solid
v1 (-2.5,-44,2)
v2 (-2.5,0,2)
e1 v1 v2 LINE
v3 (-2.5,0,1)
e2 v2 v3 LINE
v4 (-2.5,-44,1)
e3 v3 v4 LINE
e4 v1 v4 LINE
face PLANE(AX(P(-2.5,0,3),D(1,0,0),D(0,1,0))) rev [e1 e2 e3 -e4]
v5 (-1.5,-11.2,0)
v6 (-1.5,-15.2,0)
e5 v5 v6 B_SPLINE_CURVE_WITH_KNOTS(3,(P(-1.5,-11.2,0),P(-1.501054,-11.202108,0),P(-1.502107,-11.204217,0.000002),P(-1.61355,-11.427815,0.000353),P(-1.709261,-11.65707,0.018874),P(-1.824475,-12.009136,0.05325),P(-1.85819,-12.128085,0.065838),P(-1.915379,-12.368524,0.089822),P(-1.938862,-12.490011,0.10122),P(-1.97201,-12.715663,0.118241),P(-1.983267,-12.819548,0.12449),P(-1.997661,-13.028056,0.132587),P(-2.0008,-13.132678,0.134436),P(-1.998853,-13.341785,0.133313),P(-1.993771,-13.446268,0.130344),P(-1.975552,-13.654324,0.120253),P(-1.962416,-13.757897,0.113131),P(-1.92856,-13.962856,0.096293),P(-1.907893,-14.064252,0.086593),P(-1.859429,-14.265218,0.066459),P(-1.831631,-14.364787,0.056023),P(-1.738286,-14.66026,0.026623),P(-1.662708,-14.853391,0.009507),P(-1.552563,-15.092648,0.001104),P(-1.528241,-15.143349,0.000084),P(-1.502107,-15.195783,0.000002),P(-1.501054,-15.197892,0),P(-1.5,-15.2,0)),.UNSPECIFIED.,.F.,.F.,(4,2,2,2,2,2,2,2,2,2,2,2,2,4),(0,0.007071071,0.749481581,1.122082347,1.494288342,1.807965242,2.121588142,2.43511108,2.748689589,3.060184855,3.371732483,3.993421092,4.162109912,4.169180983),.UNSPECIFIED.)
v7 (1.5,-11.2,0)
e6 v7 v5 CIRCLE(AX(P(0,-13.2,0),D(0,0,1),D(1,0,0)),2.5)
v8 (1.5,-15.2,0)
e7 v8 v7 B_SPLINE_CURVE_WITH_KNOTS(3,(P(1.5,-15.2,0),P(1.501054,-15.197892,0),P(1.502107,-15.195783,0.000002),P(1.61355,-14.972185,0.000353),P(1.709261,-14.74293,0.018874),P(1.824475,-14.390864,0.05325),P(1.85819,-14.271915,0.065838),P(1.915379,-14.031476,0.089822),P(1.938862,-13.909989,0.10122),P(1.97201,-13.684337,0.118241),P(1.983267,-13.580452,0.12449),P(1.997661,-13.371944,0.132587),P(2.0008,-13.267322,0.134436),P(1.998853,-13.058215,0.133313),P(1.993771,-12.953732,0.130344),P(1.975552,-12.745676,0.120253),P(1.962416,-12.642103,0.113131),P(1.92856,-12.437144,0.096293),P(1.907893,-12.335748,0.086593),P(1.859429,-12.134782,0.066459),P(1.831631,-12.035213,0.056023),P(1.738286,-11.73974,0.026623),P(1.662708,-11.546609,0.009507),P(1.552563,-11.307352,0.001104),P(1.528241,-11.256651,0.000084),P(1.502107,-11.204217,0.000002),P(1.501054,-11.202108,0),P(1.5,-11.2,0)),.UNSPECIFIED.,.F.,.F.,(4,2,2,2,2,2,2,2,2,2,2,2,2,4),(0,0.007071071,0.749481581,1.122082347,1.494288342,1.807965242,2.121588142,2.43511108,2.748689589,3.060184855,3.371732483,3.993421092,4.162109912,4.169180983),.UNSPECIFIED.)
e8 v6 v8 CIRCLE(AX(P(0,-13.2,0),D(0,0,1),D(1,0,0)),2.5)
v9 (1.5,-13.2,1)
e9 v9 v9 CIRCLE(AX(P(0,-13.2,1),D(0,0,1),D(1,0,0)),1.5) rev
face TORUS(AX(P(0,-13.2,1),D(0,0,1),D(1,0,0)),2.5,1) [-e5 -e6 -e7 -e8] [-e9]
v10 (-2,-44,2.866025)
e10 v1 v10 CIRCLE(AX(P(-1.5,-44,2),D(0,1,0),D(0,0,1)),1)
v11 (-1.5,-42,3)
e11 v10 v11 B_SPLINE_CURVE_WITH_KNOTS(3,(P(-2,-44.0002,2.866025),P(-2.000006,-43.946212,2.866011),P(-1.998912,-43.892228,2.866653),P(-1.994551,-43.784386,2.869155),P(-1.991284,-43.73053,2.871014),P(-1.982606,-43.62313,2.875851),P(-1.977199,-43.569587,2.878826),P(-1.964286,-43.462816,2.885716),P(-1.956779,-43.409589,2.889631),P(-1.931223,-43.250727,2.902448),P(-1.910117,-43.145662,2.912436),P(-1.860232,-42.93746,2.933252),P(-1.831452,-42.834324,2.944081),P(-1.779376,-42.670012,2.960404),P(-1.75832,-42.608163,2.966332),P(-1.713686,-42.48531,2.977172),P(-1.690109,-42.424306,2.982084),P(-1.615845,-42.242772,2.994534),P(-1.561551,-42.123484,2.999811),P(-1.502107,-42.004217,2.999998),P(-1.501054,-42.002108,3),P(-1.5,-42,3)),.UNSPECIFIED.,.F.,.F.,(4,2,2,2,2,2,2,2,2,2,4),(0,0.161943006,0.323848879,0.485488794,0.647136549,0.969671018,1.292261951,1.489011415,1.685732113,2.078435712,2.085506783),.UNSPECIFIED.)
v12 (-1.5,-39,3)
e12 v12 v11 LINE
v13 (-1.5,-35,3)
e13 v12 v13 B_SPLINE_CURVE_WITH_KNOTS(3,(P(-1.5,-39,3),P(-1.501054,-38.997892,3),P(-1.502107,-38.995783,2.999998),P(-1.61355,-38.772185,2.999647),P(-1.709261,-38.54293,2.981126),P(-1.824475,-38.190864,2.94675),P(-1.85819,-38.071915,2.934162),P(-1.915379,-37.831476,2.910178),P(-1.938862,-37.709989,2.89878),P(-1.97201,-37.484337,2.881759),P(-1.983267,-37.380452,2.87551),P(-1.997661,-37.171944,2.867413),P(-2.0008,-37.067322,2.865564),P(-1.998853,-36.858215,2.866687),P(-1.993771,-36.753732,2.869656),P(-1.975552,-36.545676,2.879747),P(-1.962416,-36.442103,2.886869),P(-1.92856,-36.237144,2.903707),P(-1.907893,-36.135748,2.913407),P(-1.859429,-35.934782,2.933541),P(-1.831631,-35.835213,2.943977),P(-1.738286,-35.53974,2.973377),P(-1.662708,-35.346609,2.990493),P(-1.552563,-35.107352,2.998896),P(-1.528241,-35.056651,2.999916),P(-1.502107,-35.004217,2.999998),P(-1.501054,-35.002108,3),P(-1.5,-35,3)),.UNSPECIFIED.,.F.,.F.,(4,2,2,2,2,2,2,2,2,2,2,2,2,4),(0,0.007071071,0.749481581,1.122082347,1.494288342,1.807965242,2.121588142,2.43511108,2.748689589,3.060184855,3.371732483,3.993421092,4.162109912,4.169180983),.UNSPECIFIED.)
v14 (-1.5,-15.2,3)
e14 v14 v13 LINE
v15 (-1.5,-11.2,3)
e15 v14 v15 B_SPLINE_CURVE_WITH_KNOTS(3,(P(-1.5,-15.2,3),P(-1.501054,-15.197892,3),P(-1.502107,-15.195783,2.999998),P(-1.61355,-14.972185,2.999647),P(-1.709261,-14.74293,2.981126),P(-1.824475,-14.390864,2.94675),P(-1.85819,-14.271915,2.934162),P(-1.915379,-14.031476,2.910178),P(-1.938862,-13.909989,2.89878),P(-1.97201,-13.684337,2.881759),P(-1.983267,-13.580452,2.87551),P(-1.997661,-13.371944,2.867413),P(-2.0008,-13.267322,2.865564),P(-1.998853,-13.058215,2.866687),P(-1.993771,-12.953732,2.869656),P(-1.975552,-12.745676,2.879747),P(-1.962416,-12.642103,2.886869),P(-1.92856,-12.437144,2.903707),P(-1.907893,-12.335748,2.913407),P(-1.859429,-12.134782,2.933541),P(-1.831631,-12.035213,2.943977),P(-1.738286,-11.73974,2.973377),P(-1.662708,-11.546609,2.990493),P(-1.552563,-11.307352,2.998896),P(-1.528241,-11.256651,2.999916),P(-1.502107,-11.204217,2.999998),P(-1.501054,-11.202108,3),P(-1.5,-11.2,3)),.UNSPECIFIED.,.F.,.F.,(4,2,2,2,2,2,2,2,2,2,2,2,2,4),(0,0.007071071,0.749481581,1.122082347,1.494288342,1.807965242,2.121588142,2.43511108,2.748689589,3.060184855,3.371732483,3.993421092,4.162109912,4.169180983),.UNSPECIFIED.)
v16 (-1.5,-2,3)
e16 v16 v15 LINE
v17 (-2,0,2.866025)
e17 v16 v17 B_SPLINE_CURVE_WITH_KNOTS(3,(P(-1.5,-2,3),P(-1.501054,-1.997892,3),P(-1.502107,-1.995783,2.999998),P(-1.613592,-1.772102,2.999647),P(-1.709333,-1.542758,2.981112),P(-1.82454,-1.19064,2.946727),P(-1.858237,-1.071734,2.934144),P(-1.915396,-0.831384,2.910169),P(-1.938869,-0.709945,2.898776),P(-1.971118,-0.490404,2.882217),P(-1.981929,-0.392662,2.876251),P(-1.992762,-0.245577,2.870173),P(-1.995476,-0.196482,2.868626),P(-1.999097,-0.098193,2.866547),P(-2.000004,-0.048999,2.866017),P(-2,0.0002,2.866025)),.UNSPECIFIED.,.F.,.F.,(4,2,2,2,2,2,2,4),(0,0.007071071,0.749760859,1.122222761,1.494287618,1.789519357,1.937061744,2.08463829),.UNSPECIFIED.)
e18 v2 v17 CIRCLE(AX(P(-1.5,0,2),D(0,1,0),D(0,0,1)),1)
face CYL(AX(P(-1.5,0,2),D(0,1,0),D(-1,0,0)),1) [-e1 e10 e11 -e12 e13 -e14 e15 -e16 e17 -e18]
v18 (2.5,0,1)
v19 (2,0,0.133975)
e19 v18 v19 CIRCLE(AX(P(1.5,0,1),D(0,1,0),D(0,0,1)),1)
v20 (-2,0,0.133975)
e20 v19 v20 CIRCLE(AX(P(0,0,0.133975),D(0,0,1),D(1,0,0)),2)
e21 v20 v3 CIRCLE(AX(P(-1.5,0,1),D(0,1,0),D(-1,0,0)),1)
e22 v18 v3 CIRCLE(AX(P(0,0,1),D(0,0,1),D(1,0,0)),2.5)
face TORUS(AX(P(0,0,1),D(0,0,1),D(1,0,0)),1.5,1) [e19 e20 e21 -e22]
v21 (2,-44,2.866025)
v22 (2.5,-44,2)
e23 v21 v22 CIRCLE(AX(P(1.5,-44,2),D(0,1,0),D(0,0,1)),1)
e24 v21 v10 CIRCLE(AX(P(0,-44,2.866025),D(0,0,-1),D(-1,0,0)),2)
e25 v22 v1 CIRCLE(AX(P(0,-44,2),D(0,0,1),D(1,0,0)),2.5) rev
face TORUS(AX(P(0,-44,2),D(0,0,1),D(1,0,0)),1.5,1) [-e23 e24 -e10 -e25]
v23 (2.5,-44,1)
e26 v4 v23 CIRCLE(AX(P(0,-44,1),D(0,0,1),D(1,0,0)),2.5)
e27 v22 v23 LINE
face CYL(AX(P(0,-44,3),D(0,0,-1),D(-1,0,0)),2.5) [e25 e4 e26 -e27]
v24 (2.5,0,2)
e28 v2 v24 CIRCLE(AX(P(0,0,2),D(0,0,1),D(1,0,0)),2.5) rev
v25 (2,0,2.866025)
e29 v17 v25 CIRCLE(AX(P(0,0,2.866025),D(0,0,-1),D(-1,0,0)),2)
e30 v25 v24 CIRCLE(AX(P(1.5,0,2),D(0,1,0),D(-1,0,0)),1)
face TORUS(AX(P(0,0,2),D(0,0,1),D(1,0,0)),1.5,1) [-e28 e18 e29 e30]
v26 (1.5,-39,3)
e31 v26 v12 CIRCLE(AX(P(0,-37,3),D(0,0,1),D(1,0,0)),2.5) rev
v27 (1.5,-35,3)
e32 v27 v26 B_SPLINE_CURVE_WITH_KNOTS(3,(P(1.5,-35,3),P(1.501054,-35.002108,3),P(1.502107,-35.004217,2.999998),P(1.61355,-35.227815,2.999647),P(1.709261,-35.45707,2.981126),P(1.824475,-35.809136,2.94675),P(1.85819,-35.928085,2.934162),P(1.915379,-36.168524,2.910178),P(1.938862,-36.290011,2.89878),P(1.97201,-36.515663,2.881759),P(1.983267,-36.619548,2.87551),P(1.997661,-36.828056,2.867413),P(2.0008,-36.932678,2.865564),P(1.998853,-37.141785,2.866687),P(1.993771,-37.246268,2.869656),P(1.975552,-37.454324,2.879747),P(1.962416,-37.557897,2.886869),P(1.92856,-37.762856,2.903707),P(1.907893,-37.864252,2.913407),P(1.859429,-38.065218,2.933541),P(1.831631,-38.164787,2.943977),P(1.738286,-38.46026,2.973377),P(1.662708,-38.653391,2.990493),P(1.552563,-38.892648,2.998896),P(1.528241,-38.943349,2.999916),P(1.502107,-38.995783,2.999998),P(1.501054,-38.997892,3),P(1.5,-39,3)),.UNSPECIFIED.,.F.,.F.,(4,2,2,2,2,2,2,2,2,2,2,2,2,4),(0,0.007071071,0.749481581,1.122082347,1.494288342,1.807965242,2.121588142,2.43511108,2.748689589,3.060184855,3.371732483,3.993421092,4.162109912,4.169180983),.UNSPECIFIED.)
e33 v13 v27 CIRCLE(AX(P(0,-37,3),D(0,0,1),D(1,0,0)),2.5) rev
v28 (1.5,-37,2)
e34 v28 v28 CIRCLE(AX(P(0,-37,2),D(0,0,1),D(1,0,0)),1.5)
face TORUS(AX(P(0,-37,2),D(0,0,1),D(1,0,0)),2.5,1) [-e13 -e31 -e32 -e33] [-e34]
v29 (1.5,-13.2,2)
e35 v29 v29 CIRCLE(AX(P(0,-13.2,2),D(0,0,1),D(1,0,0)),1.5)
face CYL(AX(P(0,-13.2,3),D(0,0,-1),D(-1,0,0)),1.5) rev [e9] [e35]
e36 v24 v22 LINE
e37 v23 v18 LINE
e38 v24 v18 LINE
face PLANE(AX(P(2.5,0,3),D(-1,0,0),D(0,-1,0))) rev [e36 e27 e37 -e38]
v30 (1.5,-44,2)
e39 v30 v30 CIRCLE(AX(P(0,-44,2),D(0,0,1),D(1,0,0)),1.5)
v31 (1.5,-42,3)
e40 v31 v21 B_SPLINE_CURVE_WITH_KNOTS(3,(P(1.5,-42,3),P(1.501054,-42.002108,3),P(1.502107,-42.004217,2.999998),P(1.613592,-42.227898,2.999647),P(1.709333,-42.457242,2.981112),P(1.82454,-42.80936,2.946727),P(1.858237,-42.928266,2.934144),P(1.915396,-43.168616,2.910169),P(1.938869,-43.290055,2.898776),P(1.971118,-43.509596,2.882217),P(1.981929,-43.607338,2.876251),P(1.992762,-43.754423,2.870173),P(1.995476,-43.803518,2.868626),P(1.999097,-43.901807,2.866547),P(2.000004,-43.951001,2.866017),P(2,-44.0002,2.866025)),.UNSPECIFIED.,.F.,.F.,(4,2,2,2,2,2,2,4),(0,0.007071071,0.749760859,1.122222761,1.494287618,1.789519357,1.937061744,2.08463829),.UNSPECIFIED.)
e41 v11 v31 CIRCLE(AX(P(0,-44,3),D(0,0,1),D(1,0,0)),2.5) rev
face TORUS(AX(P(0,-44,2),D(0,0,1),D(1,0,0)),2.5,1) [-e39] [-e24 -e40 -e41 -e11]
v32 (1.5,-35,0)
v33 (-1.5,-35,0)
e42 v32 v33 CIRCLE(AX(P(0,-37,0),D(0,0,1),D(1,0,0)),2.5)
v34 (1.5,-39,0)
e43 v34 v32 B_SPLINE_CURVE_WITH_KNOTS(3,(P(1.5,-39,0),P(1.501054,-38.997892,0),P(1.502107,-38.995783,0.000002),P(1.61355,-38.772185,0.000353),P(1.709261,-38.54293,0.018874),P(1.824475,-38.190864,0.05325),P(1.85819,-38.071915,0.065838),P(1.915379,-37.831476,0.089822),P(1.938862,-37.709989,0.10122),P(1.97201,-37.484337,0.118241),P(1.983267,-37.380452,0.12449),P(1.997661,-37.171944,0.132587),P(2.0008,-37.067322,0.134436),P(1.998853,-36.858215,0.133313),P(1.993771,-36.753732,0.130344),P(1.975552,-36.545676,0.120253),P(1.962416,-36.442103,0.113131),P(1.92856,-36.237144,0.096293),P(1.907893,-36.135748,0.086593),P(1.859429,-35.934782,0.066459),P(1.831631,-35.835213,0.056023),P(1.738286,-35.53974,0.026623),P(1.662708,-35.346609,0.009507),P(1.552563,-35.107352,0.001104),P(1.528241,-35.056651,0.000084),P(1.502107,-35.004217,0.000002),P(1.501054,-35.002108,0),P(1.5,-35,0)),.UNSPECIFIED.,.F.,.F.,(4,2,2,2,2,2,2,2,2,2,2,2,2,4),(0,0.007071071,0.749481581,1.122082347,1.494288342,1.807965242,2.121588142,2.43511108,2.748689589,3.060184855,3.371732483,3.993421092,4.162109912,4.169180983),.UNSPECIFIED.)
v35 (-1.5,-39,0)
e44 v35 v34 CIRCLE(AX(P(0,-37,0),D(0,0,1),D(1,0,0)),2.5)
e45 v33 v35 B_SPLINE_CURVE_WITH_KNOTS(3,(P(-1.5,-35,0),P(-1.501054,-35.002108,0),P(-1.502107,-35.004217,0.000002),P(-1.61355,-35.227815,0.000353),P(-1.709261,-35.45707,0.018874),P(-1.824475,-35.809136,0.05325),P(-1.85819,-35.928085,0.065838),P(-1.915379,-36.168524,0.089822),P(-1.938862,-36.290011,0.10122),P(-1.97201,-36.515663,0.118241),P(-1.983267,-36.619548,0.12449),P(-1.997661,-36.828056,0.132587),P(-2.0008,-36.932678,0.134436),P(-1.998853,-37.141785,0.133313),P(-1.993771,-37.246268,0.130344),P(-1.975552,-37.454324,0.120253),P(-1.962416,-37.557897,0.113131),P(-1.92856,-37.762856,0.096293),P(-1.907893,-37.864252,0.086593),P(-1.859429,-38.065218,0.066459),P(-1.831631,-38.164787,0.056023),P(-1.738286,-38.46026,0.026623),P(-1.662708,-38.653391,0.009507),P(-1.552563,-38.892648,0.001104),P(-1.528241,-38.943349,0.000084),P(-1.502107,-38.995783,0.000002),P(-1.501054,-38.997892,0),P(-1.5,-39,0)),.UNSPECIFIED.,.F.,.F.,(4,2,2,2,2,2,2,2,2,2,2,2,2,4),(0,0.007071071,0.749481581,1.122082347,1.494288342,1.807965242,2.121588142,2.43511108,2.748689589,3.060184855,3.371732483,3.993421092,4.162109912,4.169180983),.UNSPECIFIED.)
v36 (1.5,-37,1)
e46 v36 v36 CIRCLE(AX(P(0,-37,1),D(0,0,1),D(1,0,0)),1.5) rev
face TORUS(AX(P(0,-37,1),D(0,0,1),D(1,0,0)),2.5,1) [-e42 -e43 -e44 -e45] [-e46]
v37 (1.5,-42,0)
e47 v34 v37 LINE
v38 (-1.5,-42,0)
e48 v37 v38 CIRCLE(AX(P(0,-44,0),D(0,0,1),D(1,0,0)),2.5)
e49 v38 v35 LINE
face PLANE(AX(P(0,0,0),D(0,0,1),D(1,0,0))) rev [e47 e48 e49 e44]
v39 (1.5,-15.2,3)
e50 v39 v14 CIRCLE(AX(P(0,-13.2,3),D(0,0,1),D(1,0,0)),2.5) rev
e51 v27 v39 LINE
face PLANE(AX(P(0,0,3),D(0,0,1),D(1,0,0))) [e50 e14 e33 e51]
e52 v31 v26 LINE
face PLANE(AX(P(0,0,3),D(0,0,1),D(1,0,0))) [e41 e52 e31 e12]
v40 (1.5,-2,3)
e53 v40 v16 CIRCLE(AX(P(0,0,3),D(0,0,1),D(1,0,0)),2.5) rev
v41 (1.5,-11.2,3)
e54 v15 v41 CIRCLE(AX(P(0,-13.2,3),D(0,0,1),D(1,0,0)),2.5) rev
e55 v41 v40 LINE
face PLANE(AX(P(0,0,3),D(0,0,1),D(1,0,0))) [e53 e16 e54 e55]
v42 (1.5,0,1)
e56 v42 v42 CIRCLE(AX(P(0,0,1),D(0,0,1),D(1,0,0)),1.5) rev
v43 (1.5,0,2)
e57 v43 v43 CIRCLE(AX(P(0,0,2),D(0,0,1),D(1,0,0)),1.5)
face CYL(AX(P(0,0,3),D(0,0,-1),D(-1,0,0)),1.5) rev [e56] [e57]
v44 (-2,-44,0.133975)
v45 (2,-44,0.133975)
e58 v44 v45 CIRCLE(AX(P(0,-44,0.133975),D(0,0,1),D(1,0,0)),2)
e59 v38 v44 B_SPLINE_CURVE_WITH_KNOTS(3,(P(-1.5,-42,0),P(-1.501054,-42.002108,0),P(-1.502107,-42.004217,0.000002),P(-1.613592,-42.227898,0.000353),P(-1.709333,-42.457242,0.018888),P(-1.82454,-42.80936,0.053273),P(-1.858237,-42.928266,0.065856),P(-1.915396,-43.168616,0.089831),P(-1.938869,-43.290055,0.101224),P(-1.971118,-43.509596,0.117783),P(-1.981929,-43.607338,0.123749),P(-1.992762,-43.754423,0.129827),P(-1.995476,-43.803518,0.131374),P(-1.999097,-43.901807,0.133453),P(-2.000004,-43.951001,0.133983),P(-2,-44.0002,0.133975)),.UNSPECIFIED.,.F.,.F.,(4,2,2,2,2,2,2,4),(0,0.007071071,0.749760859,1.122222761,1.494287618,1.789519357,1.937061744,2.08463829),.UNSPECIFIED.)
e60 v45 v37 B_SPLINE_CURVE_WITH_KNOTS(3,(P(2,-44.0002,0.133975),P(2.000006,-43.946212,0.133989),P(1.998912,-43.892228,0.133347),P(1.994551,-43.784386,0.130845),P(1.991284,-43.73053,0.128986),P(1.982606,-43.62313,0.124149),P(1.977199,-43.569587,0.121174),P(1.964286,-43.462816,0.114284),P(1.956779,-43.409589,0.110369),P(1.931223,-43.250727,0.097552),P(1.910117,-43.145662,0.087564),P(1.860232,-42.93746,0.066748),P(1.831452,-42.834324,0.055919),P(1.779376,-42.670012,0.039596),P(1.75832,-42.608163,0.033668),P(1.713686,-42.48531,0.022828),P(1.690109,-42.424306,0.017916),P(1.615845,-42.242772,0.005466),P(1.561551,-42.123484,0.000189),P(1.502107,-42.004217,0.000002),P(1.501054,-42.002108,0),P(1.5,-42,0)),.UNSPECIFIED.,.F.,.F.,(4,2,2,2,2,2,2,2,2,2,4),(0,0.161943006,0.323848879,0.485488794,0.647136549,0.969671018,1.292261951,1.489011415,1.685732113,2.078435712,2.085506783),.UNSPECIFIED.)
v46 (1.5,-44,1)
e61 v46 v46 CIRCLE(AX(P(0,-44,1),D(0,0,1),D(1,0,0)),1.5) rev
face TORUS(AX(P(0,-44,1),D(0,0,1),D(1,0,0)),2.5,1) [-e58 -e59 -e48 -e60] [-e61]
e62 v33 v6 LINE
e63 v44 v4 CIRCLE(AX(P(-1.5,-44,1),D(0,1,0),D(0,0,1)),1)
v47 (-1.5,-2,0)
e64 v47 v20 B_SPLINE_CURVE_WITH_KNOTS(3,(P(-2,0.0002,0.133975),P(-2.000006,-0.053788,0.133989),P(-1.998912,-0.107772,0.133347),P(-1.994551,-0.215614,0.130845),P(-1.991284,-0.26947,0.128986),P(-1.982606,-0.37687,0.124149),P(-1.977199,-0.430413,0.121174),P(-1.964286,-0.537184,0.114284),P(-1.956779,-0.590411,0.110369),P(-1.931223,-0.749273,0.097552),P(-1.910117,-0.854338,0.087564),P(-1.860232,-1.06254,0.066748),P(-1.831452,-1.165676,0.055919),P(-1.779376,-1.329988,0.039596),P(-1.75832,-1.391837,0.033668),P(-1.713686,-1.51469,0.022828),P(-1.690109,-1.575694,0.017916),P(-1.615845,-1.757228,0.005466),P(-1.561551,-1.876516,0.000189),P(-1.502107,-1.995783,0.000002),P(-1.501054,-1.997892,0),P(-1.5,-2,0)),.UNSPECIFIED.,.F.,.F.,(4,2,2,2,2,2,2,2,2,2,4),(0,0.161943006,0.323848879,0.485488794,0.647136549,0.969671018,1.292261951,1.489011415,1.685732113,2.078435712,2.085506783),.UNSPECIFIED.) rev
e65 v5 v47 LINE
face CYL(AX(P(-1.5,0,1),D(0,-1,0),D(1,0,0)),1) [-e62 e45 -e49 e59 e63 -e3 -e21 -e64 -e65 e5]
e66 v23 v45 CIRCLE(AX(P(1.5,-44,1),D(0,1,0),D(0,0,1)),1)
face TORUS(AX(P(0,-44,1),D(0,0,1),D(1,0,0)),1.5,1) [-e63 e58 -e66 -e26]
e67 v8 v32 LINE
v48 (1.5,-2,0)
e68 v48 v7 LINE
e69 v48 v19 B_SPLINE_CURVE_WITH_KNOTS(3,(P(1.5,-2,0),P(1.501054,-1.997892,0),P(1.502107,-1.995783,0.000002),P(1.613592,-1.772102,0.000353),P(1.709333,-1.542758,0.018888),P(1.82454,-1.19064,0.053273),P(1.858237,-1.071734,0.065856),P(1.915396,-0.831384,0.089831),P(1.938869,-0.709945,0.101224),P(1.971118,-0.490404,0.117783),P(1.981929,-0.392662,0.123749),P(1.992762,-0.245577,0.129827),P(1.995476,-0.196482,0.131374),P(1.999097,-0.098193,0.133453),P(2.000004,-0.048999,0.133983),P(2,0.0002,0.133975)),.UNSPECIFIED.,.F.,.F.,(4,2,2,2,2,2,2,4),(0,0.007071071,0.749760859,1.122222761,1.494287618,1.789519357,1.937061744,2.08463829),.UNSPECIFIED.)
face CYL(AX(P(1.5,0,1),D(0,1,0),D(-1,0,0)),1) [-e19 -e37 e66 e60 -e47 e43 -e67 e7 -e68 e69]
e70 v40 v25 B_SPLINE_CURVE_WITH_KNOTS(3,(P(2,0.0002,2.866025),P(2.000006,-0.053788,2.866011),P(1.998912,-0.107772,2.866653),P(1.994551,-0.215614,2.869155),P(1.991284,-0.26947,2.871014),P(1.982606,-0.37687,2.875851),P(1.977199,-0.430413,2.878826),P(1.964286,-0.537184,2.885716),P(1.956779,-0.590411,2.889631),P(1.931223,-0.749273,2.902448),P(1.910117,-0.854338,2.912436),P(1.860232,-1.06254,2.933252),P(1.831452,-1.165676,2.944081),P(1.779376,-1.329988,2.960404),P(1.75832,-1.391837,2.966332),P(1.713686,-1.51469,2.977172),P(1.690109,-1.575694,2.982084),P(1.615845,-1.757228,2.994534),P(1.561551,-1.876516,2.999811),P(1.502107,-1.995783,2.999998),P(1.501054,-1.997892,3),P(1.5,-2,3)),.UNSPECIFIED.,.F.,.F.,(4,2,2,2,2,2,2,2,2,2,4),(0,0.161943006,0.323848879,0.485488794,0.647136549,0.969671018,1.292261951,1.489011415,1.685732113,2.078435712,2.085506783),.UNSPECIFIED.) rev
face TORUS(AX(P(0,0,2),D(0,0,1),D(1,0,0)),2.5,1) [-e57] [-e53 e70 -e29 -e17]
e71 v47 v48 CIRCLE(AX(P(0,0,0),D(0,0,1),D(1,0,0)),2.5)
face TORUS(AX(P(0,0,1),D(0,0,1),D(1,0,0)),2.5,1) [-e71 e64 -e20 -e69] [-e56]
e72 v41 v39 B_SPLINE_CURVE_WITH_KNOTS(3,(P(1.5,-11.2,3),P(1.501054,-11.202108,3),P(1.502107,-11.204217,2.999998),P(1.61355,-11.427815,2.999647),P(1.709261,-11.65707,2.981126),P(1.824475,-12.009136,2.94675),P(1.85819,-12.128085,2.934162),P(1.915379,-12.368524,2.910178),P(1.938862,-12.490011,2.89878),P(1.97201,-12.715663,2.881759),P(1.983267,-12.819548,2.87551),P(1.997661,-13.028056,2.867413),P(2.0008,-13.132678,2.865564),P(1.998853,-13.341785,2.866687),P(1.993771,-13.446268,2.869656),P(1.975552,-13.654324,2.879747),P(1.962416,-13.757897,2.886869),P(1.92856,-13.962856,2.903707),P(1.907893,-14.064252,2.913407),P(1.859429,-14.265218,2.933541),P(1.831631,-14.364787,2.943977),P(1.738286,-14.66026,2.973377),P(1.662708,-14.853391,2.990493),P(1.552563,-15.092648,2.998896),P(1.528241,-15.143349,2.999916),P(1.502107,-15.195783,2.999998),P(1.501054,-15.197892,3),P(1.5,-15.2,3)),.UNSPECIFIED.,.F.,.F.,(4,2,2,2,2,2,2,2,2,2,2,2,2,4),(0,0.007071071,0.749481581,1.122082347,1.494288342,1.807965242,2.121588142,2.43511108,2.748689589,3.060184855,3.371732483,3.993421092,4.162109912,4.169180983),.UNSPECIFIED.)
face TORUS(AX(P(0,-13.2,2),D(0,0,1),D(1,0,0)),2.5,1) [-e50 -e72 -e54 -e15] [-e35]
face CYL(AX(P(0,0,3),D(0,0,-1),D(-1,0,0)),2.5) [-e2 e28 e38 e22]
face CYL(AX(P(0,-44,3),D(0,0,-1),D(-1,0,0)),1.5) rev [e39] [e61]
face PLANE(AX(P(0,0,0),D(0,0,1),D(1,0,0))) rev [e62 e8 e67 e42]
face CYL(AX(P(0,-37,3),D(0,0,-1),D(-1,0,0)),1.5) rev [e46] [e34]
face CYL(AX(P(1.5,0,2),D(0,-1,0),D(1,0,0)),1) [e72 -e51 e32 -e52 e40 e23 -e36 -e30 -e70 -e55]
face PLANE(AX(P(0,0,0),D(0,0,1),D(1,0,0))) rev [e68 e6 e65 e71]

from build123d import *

# Parameters (mm, degrees)
SKETCH1_R           = 1.5
BOSS_EXTRUDE1_DEPTH = 3
FILLET1_R           = 1


with BuildPart() as part:
    # Sketch1 → Boss-Extrude1 (new body)
    with BuildSketch(Plane.XY):
        with BuildLine():
            Line((2.5, 0), (2.5, -44))
            ThreePointArc((2.5, -44), (0, -46.5), (-2.5, -44))
            Line((-2.5, -44), (-2.5, 0))
            ThreePointArc((-2.5, 0), (0, 2.5), (2.5, 0))
        make_face()
        Circle(SKETCH1_R, mode=Mode.SUBTRACT)
        with Locations((0, -13.2)):
            Circle(SKETCH1_R, mode=Mode.SUBTRACT)
        with Locations((0, -37)):
            Circle(SKETCH1_R, mode=Mode.SUBTRACT)
        with Locations((0, -44)):
            Circle(SKETCH1_R, mode=Mode.SUBTRACT)
    extrude(amount=BOSS_EXTRUDE1_DEPTH)

    # Fillet1
    # the kernel refuses this fillet: 1 mm, written as the material it takes off along each edge
    with BuildSketch(Plane(origin=(0, 0, 3), x_dir=(-1, 0, 0), z_dir=(0, -1, 0))) as fillet1_piece_1:
        with BuildLine():
            CenterArc((2.5 - FILLET1_R, FILLET1_R), FILLET1_R, 270, 90)
            Line((2.5 - FILLET1_R, 0), (2.5, 0))
            Line((2.5, 0), (2.5, FILLET1_R))
        make_face()
    revolve(axis=Axis((0, 0, 3), (0, 0, -1)), revolution_arc=180, mode=Mode.SUBTRACT)
    with BuildSketch(Plane(origin=(0, 0, 0), x_dir=(-1, 0, 0), z_dir=(0, -1, 0))) as fillet1_piece_2:
        with BuildLine():
            CenterArc((2.5 - FILLET1_R, -FILLET1_R), FILLET1_R, 0, 90)
            Line((2.5 - FILLET1_R, 0), (2.5, 0))
            Line((2.5, 0), (2.5, -FILLET1_R))
        make_face()
    revolve(axis=Axis((0, 0, 0), (0, 0, -1)), revolution_arc=180, mode=Mode.SUBTRACT)
    with BuildSketch(Plane(origin=(-2.5, -44, 3), x_dir=(0, 0, -1), z_dir=(0, 1, 0)), Plane(origin=(2.5, 0, 3), x_dir=(0, 0, -1), z_dir=(0, -1, 0))) as fillet1_piece_3:
        with BuildLine():
            CenterArc((FILLET1_R, -FILLET1_R), FILLET1_R, 90, 90)
            Line((0, -FILLET1_R), (0, 0))
            Line((0, 0), (FILLET1_R, 0))
        make_face()
    extrude(amount=44, mode=Mode.SUBTRACT)
    with BuildSketch(Plane(origin=(-2.5, -44, 0), x_dir=(0, 0, 1), z_dir=(0, 1, 0)), Plane(origin=(2.5, 0, 0), x_dir=(0, 0, 1), z_dir=(0, -1, 0))) as fillet1_piece_4:
        with BuildLine():
            CenterArc((FILLET1_R, FILLET1_R), FILLET1_R, 180, 90)
            Line((0, FILLET1_R), (0, 0))
            Line((0, 0), (FILLET1_R, 0))
        make_face()
    extrude(amount=44, mode=Mode.SUBTRACT)
    with BuildSketch(Plane(origin=(0, -44, 3), x_dir=(1, 0, 0), z_dir=(0, 1, 0))) as fillet1_piece_5:
        with BuildLine():
            CenterArc((2.5 - FILLET1_R, FILLET1_R), FILLET1_R, 270, 90)
            Line((2.5 - FILLET1_R, 0), (2.5, 0))
            Line((2.5, 0), (2.5, FILLET1_R))
        make_face()
    revolve(axis=Axis((0, -44, 3), (0, 0, -1)), revolution_arc=180, mode=Mode.SUBTRACT)
    with BuildSketch(Plane(origin=(0, -44, 0), x_dir=(1, 0, 0), z_dir=(0, 1, 0))) as fillet1_piece_6:
        with BuildLine():
            CenterArc((2.5 - FILLET1_R, -FILLET1_R), FILLET1_R, 0, 90)
            Line((2.5 - FILLET1_R, 0), (2.5, 0))
            Line((2.5, 0), (2.5, -FILLET1_R))
        make_face()
    revolve(axis=Axis((0, -44, 0), (0, 0, -1)), revolution_arc=180, mode=Mode.SUBTRACT)
    with BuildSketch(Plane(origin=(0, 0, 0), x_dir=(1, 0, 0), z_dir=(0, -1, 0))) as fillet1_piece_7:
        with BuildLine():
            CenterArc((1.5 + FILLET1_R, FILLET1_R), FILLET1_R, 180, 90)
            Line((1.5 + FILLET1_R, 0), (1.5, 0))
            Line((1.5, 0), (1.5, FILLET1_R))
        make_face()
    revolve(axis=Axis((0, 0, 0), (0, 0, 1)), mode=Mode.SUBTRACT)
    with BuildSketch(Plane(origin=(0, 0, 3), x_dir=(1, 0, 0), z_dir=(0, -1, 0))) as fillet1_piece_8:
        with BuildLine():
            CenterArc((1.5 + FILLET1_R, -FILLET1_R), FILLET1_R, 90, 90)
            Line((1.5 + FILLET1_R, 0), (1.5, 0))
            Line((1.5, 0), (1.5, -FILLET1_R))
        make_face()
    revolve(axis=Axis((0, 0, 3), (0, 0, 1)), mode=Mode.SUBTRACT)
    with BuildSketch(Plane(origin=(0, -13.2, 0), x_dir=(1, 0, 0), z_dir=(0, -1, 0))) as fillet1_piece_9:
        with BuildLine():
            CenterArc((1.5 + FILLET1_R, FILLET1_R), FILLET1_R, 180, 90)
            Line((1.5 + FILLET1_R, 0), (1.5, 0))
            Line((1.5, 0), (1.5, FILLET1_R))
        make_face()
    revolve(axis=Axis((0, -13.2, 0), (0, 0, 1)), mode=Mode.SUBTRACT)
    with BuildSketch(Plane(origin=(0, -13.2, 3), x_dir=(1, 0, 0), z_dir=(0, -1, 0))) as fillet1_piece_10:
        with BuildLine():
            CenterArc((1.5 + FILLET1_R, -FILLET1_R), FILLET1_R, 90, 90)
            Line((1.5 + FILLET1_R, 0), (1.5, 0))
            Line((1.5, 0), (1.5, -FILLET1_R))
        make_face()
    revolve(axis=Axis((0, -13.2, 3), (0, 0, 1)), mode=Mode.SUBTRACT)
    with BuildSketch(Plane(origin=(0, -37, 0), x_dir=(1, 0, 0), z_dir=(0, -1, 0))) as fillet1_piece_11:
        with BuildLine():
            CenterArc((1.5 + FILLET1_R, FILLET1_R), FILLET1_R, 180, 90)
            Line((1.5 + FILLET1_R, 0), (1.5, 0))
            Line((1.5, 0), (1.5, FILLET1_R))
        make_face()
    revolve(axis=Axis((0, -37, 0), (0, 0, 1)), mode=Mode.SUBTRACT)
    with BuildSketch(Plane(origin=(0, -37, 3), x_dir=(1, 0, 0), z_dir=(0, -1, 0))) as fillet1_piece_12:
        with BuildLine():
            CenterArc((1.5 + FILLET1_R, -FILLET1_R), FILLET1_R, 90, 90)
            Line((1.5 + FILLET1_R, 0), (1.5, 0))
            Line((1.5, 0), (1.5, -FILLET1_R))
        make_face()
    revolve(axis=Axis((0, -37, 3), (0, 0, 1)), mode=Mode.SUBTRACT)
    with BuildSketch(Plane(origin=(0, -44, 0), x_dir=(1, 0, 0), z_dir=(0, -1, 0))) as fillet1_piece_13:
        with BuildLine():
            CenterArc((1.5 + FILLET1_R, FILLET1_R), FILLET1_R, 180, 90)
            Line((1.5 + FILLET1_R, 0), (1.5, 0))
            Line((1.5, 0), (1.5, FILLET1_R))
        make_face()
    revolve(axis=Axis((0, -44, 0), (0, 0, 1)), mode=Mode.SUBTRACT)
    with BuildSketch(Plane(origin=(0, -44, 3), x_dir=(1, 0, 0), z_dir=(0, -1, 0))) as fillet1_piece_14:
        with BuildLine():
            CenterArc((1.5 + FILLET1_R, -FILLET1_R), FILLET1_R, 90, 90)
            Line((1.5 + FILLET1_R, 0), (1.5, 0))
            Line((1.5, 0), (1.5, -FILLET1_R))
        make_face()
    revolve(axis=Axis((0, -44, 3), (0, 0, 1)), mode=Mode.SUBTRACT)


solid = part.part
